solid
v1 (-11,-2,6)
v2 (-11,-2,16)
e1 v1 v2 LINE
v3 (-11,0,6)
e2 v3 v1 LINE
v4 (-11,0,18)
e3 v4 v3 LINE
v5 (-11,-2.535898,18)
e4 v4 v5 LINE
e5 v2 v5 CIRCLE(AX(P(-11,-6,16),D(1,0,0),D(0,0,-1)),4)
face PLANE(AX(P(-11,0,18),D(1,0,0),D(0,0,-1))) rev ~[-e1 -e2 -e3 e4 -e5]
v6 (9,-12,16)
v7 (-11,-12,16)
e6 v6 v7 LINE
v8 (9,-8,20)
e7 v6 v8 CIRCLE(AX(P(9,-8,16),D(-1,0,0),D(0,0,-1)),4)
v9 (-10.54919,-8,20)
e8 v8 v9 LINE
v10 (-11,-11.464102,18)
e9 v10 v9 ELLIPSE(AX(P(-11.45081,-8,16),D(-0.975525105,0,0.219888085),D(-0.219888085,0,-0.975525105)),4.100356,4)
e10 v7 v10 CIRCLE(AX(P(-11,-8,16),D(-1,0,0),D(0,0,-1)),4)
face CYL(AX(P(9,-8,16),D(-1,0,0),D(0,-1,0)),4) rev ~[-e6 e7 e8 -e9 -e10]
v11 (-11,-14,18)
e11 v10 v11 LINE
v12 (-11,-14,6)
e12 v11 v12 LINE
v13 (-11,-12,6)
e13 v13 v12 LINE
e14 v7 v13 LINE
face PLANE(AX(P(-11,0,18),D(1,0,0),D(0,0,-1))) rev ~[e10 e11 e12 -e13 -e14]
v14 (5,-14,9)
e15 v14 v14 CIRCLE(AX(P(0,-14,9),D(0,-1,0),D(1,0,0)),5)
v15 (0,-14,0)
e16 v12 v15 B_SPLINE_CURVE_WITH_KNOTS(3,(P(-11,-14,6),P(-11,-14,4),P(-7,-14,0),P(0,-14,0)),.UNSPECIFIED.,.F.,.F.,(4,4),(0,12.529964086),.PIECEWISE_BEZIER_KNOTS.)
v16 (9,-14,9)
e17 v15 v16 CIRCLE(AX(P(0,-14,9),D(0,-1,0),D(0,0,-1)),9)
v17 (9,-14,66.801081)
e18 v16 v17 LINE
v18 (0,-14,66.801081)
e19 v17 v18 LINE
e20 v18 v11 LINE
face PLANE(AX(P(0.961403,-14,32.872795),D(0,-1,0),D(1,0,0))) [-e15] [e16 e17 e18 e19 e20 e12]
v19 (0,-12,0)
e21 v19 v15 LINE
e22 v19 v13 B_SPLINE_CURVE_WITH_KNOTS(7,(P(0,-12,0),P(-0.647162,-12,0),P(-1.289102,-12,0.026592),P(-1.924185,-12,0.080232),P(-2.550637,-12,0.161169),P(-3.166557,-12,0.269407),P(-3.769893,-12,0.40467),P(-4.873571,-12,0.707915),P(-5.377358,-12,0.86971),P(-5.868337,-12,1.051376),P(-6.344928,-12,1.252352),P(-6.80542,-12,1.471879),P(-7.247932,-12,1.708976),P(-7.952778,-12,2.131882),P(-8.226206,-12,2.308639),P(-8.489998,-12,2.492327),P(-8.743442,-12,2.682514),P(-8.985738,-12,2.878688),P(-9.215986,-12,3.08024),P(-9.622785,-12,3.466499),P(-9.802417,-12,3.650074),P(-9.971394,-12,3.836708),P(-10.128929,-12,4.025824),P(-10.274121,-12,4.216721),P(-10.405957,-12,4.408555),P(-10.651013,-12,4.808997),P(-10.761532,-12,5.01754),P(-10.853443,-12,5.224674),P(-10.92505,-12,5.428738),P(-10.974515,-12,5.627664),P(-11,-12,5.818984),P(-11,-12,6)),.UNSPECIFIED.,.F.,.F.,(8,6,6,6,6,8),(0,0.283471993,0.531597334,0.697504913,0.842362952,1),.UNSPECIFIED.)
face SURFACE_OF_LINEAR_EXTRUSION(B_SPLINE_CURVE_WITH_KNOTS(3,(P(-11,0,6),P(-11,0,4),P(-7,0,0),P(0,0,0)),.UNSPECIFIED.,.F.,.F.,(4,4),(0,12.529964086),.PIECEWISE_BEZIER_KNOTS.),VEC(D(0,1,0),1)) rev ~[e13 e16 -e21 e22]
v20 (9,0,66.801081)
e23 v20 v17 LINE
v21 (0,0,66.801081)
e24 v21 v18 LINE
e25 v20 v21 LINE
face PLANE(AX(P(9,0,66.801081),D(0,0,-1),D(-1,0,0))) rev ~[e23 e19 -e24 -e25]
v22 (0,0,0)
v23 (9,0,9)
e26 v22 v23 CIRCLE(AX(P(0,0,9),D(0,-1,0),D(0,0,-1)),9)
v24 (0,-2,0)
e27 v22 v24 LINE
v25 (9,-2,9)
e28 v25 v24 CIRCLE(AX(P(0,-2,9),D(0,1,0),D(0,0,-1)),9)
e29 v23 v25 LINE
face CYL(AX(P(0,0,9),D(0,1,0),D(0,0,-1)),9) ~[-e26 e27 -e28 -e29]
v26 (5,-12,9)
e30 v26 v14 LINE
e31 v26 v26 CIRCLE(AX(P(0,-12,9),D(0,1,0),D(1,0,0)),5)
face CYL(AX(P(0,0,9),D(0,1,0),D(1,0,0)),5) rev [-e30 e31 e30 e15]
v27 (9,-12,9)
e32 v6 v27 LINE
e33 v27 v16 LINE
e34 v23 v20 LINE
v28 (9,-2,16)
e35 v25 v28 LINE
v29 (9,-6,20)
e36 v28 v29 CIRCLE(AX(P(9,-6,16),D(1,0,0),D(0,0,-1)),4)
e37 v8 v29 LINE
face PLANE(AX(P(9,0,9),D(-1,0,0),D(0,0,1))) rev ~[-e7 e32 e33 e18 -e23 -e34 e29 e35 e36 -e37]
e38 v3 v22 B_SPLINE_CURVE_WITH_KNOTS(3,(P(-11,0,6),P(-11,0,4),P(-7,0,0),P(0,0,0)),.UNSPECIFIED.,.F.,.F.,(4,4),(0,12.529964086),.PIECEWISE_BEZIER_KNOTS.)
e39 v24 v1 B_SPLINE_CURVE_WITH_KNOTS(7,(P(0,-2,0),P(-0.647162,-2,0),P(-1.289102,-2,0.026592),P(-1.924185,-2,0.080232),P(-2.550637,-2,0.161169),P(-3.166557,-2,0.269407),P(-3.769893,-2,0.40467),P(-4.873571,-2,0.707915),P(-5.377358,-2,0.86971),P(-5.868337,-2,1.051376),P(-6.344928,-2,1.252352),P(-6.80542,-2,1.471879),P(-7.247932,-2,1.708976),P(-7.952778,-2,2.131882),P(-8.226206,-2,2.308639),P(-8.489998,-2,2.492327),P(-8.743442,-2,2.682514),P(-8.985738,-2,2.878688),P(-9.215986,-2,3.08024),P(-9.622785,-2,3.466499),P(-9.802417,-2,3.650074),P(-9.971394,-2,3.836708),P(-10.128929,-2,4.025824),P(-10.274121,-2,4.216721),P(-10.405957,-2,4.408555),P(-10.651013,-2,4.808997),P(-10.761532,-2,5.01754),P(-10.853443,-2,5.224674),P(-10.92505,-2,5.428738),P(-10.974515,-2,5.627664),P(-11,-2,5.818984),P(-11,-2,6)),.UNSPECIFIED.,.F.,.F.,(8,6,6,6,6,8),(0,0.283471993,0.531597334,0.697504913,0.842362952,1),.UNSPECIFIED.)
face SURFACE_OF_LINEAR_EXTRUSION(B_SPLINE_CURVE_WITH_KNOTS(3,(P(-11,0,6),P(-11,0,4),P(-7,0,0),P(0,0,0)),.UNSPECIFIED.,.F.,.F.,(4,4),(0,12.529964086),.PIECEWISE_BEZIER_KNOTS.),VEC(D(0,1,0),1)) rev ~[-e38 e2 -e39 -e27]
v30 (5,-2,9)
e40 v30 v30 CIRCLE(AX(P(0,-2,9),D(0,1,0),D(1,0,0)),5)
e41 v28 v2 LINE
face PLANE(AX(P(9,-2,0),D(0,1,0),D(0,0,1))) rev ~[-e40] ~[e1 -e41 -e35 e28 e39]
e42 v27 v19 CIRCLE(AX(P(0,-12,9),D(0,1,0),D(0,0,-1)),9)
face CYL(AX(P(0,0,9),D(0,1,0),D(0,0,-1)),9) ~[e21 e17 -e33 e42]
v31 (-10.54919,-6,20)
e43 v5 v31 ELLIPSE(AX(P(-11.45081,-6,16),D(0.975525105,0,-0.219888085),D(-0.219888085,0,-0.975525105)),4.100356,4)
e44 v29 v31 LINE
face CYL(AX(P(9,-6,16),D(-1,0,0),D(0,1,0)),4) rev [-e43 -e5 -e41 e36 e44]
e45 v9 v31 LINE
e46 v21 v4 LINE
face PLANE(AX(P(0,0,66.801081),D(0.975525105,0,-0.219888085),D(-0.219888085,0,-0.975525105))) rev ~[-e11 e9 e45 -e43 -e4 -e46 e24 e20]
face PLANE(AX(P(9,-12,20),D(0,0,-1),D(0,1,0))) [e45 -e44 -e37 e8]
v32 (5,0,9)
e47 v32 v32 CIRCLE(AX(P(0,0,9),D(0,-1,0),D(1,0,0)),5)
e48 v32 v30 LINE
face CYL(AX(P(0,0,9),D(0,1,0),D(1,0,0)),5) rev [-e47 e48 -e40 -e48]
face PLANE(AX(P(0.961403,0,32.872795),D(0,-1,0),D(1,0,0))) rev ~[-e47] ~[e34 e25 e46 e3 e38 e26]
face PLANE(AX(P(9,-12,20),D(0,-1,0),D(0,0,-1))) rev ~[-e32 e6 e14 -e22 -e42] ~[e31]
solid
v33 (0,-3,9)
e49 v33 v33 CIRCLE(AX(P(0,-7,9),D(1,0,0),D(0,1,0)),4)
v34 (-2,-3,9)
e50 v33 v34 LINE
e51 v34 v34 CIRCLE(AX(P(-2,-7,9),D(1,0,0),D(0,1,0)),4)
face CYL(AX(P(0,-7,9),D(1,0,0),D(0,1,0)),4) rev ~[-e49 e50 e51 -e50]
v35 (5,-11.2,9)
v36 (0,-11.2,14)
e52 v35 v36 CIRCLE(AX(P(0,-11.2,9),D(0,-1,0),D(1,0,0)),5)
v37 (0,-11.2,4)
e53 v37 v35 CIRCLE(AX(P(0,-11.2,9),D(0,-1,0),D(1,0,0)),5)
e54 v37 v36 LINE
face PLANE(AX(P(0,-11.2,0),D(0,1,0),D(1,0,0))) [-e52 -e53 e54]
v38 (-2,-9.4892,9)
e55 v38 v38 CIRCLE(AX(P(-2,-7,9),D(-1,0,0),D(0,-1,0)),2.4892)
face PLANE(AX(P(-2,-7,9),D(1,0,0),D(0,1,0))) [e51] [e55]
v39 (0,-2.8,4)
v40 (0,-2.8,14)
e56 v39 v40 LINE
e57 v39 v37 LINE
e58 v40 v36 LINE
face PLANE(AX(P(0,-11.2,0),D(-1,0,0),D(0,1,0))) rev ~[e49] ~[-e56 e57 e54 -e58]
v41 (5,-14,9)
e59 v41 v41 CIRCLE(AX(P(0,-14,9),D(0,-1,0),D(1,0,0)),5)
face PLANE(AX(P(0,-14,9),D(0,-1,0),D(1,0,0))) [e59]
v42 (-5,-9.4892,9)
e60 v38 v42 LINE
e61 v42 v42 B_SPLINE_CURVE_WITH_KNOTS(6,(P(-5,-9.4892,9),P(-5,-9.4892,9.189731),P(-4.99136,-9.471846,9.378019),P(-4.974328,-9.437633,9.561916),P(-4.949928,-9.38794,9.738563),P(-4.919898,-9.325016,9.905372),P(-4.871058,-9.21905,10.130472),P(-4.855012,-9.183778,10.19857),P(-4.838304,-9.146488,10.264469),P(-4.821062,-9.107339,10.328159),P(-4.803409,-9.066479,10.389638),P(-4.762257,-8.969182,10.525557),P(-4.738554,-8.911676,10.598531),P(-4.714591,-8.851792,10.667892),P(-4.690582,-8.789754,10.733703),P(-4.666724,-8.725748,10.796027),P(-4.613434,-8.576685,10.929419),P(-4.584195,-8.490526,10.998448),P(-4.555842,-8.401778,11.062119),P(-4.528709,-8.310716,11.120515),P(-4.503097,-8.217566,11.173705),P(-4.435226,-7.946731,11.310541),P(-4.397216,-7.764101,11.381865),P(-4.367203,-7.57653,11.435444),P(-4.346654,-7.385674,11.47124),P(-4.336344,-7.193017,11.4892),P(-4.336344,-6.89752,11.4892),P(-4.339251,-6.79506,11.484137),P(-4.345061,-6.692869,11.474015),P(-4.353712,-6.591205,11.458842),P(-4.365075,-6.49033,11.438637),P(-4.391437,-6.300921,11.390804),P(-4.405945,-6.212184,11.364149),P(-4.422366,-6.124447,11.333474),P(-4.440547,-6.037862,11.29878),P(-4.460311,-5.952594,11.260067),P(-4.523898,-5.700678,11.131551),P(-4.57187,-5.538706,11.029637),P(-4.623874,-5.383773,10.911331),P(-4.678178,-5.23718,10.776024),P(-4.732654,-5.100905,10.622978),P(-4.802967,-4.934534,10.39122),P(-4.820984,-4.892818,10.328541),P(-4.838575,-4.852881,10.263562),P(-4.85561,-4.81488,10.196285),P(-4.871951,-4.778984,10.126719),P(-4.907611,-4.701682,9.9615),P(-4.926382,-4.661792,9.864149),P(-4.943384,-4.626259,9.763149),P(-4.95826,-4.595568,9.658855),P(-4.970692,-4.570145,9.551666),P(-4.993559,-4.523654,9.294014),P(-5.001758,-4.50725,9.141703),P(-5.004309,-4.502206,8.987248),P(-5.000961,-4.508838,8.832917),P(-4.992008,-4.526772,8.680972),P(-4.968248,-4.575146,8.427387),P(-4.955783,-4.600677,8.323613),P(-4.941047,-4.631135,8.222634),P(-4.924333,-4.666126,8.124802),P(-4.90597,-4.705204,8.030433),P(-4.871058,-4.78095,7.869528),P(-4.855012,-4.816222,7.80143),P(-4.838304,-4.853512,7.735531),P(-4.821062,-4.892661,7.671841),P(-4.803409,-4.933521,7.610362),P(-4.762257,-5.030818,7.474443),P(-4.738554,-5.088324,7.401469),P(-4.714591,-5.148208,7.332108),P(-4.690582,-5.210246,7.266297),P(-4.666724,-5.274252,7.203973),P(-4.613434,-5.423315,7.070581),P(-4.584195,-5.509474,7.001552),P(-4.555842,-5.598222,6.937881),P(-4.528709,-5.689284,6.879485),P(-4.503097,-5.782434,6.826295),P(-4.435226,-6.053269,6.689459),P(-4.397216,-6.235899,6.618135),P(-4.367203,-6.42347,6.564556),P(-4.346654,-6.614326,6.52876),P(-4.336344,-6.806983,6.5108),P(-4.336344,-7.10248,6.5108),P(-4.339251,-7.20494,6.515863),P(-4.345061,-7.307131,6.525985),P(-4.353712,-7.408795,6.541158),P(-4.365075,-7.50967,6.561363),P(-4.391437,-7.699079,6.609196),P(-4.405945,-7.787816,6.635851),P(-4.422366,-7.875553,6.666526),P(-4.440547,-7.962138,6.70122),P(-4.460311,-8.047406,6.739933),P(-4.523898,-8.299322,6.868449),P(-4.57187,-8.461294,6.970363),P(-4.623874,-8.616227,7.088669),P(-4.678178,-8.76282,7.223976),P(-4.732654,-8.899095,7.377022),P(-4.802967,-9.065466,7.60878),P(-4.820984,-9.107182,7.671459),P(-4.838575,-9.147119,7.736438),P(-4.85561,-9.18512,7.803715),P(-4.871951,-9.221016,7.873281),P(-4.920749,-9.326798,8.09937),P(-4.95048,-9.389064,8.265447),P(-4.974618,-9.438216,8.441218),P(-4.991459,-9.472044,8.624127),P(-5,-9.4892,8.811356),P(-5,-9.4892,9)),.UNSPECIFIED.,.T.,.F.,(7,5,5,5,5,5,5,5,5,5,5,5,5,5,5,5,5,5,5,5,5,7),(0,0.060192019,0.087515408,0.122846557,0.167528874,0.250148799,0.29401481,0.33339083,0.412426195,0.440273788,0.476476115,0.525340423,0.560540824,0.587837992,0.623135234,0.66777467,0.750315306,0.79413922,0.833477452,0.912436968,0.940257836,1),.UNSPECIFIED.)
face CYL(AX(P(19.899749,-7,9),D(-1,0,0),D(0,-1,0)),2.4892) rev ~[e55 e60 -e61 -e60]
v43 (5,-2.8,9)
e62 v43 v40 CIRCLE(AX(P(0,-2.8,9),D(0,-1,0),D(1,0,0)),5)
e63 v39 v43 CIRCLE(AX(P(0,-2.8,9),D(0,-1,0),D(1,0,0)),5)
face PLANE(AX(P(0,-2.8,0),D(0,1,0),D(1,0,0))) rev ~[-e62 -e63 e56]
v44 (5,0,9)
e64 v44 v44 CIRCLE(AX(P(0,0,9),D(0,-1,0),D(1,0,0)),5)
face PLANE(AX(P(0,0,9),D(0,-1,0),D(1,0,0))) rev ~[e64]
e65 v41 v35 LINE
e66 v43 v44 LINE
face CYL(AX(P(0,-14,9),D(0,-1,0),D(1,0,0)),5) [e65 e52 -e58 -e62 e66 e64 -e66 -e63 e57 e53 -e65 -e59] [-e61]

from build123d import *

# Parameters (mm, degrees)
F0_R      = 5
F1_DEPTH  = 14
F2_W      = 10
F2_H      = 9
F2_H_2    = 11
F3_DEPTH  = 25
F5_R      = 5
F6_DEPTH  = 14
F7_W      = 5
F7_H      = 8.4
F8_DEPTH  = 66.8020807441
F10_D     = 4.9784
F9_R      = 4
F11_DEPTH = 2
F12_R     = 4


with BuildPart() as f1:
    # F0 (on Front) → F1 (new body)
    with BuildSketch(Plane.XZ):
        with BuildLine():
            ThreePointArc((0, 0), (6.3639610307, 2.6360389693), (9, 9))
            Line((9, 9), (9, 66.8010806441))
            Line((9, 66.8010806441), (0, 66.8010806441))
            Line((0, 66.8010806441), (-11, 18))
            Line((-11, 18), (-11, 6))
            add(Edge.make_bspline(
                [(-11, 6), (-11, 4), (-7, 0), (0, 0)],
                knots=[0, 0, 0, 0, 12.5299640861, 12.5299640861, 12.5299640861, 12.5299640861], degree=3))
        make_face()
        with Locations((0, 9)):
            Circle(F0_R, mode=Mode.SUBTRACT)
    extrude(amount=F1_DEPTH)

    # F2 (on face) → F3 (cut)
    with BuildSketch(Plane.YZ.offset(9)):
        with Locations((-7, 4.5)):
            Rectangle(F2_W, F2_H)
        with Locations((-7, 14.5)):
            Rectangle(F2_W, F2_H_2)
    extrude(amount=-F3_DEPTH, mode=Mode.SUBTRACT)

    # F12
    f12_edges = [f1.edges().sort_by_distance(p)[0] for p in [
        (-0.774595, -12, 20),
        (-0.774595, -2, 20),
    ]]
    fillet(f12_edges, radius=F12_R)


with BuildPart() as f6:
    # F5 (on face) → F6 (new body, through all)
    with BuildSketch(Plane.XZ.offset(14)):
        with Locations((0, 9)):
            Circle(F5_R)
    extrude(amount=-F6_DEPTH)

    # F7 (on Top) → F8 (cut, through all)
    with BuildSketch(Plane.XY):
        with Locations((2.5, -7)):
            Rectangle(F7_W, F7_H)
    extrude(amount=F8_DEPTH, mode=Mode.SUBTRACT)

    # F10 (through all)
    with Locations(Plane.YZ):
        with Locations((-7, 9)):
            Hole(F10_D / 2)

    # F9 (on face) → F11 (cut)
    with BuildSketch(Plane.YZ):
        with Locations((-7, 9)):
            Circle(F9_R)
    extrude(amount=-F11_DEPTH, mode=Mode.SUBTRACT)


solid = Compound([f1.part, f6.part])
